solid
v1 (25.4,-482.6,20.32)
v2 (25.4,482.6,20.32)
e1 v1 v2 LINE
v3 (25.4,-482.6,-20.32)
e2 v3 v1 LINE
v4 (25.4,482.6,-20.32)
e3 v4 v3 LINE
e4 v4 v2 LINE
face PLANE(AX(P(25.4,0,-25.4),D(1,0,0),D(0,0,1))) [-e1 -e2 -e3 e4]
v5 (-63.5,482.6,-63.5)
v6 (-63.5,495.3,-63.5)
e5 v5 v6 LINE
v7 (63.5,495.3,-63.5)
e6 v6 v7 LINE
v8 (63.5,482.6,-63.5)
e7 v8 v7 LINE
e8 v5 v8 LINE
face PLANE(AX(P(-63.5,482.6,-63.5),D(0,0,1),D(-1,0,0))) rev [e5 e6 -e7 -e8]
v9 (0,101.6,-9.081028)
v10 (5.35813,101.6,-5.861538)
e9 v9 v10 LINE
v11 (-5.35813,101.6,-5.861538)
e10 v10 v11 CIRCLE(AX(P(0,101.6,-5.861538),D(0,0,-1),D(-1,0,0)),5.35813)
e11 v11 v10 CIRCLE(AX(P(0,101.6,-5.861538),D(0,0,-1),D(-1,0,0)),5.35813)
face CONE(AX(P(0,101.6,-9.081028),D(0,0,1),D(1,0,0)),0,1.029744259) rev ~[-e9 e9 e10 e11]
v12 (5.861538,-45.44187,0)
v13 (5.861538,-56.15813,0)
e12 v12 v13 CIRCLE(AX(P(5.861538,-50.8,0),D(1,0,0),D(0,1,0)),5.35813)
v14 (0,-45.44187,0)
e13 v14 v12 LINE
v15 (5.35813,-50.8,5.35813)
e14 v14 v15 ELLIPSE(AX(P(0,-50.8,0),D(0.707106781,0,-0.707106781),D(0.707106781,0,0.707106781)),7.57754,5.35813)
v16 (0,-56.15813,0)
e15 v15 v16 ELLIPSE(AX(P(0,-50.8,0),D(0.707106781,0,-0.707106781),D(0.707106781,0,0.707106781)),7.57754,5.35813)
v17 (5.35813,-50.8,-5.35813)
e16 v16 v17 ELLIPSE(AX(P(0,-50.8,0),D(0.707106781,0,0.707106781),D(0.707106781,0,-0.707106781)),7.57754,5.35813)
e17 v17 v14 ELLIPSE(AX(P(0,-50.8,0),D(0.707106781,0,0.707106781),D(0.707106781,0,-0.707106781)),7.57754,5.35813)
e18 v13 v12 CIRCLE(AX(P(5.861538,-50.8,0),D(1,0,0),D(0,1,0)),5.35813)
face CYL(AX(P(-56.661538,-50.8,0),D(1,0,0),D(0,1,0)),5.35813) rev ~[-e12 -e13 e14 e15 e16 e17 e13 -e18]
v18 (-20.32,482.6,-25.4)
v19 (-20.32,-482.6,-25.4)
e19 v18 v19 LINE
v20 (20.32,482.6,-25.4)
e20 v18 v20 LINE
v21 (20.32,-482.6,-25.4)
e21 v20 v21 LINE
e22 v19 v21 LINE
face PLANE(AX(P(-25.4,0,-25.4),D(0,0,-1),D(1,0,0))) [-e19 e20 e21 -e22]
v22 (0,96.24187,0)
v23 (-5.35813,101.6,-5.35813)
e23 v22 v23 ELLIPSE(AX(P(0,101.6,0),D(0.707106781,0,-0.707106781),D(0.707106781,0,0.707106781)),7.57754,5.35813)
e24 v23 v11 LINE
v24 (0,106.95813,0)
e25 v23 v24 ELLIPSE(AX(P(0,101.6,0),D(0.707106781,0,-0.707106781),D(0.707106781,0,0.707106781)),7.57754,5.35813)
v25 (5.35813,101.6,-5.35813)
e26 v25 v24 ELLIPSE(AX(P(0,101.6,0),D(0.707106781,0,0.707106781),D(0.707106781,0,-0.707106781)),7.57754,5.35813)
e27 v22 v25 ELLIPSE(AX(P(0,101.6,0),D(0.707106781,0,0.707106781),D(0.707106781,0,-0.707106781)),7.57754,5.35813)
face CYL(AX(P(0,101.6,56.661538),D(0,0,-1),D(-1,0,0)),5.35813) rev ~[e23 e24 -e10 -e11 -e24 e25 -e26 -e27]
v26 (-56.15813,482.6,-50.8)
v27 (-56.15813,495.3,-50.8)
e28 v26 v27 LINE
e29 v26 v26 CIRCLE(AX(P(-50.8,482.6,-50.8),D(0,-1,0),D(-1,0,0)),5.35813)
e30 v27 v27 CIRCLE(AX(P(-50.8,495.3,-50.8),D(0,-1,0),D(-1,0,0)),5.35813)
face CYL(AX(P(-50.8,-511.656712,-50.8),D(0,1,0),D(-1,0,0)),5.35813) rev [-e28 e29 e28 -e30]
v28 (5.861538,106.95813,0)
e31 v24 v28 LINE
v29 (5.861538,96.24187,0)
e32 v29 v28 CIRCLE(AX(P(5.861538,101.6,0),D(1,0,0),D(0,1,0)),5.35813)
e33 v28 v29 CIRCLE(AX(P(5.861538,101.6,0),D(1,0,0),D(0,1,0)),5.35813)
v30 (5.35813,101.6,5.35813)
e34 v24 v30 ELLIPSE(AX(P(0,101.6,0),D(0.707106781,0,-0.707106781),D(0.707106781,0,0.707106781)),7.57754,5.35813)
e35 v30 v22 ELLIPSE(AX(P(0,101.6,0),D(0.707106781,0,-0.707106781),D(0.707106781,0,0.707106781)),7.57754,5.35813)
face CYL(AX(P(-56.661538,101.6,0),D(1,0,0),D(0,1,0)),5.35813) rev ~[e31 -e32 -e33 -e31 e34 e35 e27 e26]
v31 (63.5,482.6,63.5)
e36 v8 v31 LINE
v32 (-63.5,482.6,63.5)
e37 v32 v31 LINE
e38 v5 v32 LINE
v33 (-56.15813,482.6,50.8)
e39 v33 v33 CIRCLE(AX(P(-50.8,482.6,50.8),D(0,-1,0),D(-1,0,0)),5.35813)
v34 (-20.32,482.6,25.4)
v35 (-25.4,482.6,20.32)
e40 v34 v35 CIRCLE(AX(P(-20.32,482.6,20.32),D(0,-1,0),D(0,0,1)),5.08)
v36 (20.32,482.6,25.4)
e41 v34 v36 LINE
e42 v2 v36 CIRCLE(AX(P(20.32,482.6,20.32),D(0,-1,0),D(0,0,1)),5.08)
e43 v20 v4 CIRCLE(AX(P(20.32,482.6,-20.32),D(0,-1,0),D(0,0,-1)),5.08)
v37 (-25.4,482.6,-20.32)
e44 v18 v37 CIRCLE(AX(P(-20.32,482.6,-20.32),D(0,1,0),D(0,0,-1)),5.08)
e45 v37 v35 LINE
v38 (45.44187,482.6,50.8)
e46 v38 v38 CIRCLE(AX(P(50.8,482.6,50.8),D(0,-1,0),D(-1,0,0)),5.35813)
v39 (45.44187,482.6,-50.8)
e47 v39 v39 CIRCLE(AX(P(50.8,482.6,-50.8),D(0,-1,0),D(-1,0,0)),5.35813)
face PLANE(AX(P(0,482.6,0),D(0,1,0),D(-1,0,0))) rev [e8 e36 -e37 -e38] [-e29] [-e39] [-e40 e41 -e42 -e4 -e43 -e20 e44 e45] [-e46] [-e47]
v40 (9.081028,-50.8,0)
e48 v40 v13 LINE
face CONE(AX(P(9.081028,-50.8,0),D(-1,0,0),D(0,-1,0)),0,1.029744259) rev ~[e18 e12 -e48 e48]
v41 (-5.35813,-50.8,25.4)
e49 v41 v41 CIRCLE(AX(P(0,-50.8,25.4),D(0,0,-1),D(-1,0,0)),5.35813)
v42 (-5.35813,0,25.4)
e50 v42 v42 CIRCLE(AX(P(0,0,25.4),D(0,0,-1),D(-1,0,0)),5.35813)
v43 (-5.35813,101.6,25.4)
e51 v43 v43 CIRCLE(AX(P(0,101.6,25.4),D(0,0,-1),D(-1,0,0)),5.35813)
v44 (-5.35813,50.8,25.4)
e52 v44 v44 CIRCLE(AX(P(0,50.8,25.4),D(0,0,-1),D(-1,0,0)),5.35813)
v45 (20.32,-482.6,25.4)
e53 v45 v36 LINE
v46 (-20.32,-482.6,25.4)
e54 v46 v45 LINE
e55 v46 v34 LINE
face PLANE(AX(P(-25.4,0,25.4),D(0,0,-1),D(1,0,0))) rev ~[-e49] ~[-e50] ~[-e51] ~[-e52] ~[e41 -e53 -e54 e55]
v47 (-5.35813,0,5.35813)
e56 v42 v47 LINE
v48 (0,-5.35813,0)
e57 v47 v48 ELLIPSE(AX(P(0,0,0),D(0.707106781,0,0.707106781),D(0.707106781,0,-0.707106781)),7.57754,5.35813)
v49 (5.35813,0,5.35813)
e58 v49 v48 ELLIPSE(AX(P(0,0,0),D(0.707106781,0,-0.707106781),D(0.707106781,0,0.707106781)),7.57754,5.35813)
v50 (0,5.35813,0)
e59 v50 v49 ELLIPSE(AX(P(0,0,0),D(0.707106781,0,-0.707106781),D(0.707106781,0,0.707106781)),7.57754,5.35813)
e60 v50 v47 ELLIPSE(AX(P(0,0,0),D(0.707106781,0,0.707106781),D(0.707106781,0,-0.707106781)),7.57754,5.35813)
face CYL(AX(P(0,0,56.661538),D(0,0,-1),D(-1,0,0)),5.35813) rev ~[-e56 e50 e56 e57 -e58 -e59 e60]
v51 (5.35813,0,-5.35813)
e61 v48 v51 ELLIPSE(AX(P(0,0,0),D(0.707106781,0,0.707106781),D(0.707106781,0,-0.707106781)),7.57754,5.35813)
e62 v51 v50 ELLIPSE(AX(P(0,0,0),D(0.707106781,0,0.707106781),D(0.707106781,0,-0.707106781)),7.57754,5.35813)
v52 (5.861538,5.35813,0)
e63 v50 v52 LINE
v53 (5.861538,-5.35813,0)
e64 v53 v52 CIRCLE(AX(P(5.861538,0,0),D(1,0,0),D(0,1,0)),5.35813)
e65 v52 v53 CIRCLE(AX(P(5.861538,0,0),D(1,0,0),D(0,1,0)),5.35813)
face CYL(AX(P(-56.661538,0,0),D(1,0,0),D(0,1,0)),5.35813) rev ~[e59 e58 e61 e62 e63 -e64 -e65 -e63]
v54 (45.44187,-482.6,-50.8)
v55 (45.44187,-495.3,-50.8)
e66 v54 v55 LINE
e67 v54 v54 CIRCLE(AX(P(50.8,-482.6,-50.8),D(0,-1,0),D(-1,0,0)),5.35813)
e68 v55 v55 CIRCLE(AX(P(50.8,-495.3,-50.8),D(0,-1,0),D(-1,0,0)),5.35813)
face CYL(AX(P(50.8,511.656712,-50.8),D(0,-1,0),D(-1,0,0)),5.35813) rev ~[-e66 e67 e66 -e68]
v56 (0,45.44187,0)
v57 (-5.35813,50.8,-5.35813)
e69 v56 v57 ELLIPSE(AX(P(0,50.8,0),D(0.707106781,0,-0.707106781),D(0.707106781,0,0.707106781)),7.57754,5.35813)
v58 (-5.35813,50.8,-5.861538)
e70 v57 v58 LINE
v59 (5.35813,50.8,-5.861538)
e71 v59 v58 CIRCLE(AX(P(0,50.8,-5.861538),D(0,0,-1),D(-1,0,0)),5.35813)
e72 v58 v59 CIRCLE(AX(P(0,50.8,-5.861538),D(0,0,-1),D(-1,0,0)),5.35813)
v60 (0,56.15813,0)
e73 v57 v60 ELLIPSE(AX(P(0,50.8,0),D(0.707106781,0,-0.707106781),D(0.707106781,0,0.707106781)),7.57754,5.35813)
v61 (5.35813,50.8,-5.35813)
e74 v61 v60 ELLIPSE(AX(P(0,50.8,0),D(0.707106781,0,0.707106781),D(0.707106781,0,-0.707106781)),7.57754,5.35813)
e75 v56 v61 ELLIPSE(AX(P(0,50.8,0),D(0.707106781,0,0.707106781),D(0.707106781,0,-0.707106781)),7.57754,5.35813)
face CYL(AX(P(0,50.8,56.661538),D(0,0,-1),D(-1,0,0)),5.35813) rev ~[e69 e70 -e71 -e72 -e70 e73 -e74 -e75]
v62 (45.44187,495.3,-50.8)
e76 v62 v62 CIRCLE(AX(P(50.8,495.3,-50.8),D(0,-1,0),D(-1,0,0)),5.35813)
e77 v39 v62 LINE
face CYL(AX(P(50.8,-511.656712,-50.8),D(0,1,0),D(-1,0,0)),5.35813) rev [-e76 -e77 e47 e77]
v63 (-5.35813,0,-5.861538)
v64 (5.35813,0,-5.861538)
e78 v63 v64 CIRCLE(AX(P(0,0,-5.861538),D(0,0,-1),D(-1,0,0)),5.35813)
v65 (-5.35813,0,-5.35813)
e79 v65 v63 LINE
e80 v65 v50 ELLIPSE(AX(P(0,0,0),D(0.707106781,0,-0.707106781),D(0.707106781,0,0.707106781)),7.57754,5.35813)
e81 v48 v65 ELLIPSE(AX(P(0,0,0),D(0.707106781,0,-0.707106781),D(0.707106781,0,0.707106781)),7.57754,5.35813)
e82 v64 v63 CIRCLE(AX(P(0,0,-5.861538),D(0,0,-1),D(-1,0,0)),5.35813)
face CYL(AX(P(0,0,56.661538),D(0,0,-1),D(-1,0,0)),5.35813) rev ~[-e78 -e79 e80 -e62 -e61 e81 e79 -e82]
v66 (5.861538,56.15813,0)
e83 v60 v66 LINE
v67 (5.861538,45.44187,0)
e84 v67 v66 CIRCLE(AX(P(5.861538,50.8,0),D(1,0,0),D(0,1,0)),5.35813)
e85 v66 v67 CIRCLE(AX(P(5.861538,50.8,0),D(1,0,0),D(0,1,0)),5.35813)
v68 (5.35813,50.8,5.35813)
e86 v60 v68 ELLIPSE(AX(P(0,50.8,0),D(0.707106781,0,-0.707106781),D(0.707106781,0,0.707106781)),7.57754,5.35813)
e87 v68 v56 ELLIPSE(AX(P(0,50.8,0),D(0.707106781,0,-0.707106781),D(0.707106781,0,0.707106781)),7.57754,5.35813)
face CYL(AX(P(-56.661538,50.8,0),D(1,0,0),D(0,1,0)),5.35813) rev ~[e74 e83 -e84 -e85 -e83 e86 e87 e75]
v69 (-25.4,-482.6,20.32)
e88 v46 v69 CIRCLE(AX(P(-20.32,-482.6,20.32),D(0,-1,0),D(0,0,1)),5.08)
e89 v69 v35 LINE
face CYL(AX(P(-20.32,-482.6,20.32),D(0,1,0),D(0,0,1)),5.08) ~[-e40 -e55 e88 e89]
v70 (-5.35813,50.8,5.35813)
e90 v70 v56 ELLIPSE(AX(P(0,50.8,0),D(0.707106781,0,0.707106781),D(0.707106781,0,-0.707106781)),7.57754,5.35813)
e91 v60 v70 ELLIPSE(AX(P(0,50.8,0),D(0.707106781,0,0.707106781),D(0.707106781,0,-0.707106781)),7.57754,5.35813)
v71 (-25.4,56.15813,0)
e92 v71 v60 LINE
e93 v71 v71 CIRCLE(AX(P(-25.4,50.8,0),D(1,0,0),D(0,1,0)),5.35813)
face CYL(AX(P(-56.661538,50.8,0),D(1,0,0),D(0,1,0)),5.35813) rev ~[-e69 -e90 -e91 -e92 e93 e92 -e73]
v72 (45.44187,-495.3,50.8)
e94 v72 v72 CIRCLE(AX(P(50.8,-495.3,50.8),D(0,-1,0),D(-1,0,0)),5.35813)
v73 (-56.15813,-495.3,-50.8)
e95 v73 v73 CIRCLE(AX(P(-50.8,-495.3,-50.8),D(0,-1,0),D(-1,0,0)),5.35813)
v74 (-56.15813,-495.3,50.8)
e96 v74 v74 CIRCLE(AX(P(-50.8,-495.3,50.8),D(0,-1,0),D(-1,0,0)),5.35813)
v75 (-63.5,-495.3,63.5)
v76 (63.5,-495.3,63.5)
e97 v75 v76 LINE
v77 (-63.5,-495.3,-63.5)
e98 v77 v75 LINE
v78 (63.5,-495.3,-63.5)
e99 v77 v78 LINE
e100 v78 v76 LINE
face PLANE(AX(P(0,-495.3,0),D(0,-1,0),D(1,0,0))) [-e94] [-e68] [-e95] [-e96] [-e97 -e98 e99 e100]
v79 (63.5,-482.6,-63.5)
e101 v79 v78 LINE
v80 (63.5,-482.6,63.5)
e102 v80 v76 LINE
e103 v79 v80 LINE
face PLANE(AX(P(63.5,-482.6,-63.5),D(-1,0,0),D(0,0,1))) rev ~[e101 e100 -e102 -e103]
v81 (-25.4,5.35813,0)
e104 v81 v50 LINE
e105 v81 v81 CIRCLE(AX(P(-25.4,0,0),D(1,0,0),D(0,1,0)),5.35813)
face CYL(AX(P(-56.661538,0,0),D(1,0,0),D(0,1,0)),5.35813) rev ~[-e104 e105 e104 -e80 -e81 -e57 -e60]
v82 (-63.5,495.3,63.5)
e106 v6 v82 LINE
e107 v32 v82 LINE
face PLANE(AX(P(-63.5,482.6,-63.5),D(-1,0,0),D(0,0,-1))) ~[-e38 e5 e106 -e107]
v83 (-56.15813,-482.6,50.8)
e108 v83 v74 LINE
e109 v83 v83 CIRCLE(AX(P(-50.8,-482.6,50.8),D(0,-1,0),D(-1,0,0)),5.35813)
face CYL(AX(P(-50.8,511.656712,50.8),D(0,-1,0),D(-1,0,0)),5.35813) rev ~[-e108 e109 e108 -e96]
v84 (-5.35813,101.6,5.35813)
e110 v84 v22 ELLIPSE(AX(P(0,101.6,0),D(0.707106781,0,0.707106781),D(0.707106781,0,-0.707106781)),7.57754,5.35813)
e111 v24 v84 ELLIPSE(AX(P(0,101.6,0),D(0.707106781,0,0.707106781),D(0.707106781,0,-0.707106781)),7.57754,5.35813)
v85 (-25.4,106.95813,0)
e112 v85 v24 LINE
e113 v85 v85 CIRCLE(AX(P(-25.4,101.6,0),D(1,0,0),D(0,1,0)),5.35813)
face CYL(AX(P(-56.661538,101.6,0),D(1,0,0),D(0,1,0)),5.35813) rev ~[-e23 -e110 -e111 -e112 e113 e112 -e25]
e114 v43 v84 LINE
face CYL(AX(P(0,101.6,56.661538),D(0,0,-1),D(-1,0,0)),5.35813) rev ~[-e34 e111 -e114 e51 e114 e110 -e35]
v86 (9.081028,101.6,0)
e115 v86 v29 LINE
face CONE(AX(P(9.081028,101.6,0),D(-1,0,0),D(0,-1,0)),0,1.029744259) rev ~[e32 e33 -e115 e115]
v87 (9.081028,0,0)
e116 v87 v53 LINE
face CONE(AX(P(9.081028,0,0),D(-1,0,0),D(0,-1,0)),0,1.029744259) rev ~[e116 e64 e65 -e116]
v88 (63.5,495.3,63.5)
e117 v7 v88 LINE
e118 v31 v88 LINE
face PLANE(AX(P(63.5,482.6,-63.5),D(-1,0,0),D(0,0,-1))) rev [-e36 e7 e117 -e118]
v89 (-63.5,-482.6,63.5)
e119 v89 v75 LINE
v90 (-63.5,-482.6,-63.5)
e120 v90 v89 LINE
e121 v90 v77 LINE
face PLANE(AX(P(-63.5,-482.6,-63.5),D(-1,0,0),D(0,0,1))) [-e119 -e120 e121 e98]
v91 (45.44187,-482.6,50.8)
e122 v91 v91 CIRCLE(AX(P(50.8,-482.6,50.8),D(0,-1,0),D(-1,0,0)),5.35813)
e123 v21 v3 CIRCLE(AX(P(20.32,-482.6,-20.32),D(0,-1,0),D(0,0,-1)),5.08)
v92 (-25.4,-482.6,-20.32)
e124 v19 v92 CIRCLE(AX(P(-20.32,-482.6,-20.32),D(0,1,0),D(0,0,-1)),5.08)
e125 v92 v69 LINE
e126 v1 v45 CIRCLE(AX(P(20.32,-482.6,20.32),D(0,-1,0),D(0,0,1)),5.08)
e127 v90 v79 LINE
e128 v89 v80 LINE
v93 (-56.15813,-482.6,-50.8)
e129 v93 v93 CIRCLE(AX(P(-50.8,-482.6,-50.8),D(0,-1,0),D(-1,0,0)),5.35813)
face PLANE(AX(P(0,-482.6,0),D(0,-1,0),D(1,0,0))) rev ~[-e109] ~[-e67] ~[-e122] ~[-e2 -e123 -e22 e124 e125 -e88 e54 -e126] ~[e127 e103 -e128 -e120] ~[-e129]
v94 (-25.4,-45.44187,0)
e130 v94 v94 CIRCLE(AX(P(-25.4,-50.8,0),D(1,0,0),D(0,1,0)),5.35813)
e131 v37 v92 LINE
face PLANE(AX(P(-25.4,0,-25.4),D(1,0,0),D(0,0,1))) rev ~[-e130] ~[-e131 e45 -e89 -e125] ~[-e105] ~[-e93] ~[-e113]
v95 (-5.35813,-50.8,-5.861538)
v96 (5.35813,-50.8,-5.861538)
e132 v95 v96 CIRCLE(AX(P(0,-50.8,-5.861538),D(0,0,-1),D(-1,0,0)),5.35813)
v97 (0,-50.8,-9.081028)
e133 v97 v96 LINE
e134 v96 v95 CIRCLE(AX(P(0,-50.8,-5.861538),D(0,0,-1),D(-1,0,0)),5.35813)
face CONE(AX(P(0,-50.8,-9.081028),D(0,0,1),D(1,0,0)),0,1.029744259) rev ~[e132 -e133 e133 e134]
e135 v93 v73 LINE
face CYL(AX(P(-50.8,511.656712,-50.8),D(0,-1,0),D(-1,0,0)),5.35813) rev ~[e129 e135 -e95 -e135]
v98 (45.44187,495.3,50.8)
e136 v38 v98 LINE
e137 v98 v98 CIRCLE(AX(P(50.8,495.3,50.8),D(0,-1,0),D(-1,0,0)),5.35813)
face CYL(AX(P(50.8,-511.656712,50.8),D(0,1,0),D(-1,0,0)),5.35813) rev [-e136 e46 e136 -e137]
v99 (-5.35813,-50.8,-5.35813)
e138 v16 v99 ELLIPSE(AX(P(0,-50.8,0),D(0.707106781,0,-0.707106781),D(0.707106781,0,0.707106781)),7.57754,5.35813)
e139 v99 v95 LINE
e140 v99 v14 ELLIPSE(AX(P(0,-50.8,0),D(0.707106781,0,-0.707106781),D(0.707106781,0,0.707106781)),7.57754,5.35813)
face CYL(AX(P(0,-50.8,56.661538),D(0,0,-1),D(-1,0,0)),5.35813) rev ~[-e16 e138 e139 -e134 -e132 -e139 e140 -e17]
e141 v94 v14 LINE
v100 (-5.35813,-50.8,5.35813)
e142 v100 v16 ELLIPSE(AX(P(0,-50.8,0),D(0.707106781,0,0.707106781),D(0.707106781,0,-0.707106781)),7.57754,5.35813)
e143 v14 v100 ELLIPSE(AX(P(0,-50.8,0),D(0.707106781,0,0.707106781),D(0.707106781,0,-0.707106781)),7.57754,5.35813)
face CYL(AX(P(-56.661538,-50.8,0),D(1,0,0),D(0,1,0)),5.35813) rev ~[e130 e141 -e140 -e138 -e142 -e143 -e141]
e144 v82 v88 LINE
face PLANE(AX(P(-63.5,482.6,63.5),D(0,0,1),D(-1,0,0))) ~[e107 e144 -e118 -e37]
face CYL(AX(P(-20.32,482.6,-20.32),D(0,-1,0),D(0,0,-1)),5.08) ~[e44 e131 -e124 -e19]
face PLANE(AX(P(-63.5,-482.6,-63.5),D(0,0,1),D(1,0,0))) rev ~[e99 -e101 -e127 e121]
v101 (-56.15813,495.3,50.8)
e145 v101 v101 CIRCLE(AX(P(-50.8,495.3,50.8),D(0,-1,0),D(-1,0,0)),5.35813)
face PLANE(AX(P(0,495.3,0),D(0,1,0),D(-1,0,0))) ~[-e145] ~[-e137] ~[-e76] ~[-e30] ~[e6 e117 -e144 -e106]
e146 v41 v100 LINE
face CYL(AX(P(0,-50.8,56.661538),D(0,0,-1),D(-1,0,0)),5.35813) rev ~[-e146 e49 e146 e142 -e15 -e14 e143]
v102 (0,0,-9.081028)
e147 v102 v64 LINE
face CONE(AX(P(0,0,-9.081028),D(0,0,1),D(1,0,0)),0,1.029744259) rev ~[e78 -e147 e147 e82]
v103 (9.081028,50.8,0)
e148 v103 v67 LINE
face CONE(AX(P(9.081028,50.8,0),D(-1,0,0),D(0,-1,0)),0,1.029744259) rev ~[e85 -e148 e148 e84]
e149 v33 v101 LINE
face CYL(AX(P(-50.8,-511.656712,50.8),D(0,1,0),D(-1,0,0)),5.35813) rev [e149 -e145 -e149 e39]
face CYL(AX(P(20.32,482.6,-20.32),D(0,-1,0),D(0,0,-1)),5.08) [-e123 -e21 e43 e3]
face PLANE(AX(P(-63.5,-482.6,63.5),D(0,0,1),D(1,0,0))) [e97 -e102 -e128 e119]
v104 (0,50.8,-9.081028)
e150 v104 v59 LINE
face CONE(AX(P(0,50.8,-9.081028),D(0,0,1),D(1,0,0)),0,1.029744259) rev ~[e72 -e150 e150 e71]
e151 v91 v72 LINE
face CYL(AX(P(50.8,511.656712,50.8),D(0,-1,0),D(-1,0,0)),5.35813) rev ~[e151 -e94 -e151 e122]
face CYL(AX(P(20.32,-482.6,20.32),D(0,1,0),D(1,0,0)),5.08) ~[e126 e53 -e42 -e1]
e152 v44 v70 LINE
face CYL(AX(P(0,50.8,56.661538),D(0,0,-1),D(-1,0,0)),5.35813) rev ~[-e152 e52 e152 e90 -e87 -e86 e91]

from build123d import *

# Parameters (mm, degrees)
F0_W           = 50.8
F0_H           = 50.8
F1_DEPTH       = 482.6
F2_W           = 127
F2_H           = 127
F2_W_2         = 50.8
F2_H_2         = 50.8
F3_DEPTH       = 12.7
F4_R           = 5.08
F5_D           = 10.71626
F9_D           = 10.71626
F9_DEPTH       = 31.2615384615
F9_TIP         = 3.2194893086
F9_ON_F8_D     = 10.71626
F9_ON_F8_DEPTH = 31.2615384615
F9_ON_F8_TIP   = 3.2194893086


# Not quite as in the source:
# - a feature names something its author has since deleted; it is built from what else it names


with BuildPart() as f1:
    # F0 (on Front) → F1 (new body, symmetric)
    with BuildSketch(Plane.XZ):
        Rectangle(F0_W, F0_H)
    extrude(amount=F1_DEPTH, both=True)

    # F2 (on face) → F3 (join)
    with BuildSketch(Plane.XZ.offset(482.6)):
        Rectangle(F2_W, F2_H)
        Rectangle(F2_W_2, F2_H_2, mode=Mode.SUBTRACT)
        Rectangle(F2_W_2, F2_H_2)
    extrude(amount=F3_DEPTH)

    # F4
    f4_edges = [f1.edges().sort_by_distance(p)[0] for p in [
        (25.4, 0, 25.4),
        (-25.4, 0, 25.4),
        (-25.4, 0, -25.4),
        (25.4, 0, -25.4),
    ]]
    fillet(f4_edges, radius=F4_R)

    # F5 (through all)
    with Locations(Plane(origin=(0, -482.6, 0), x_dir=(1, 0, 0), z_dir=(0, 1, 0))):
        with Locations((-50.8, -50.8), (50.8, -50.8), (50.8, 50.8), (-50.8, 50.8)):
            Hole(F5_D / 2)

    # F6: F1 across plane


with BuildPart() as f1_1:
    add(f1.part)
    add(f1.part.mirror(Plane.XZ))

    # F9
    with Locations(Plane(origin=(-25.4, 0, 0), x_dir=(0, -1, 0), z_dir=(-1, 0, 0))):
        with Locations((-50.8, 0), (50.8, 0), (-101.6, 0), (0, 0)):
            Hole(F9_D / 2, depth=F9_DEPTH)
            with Locations((0, 0, -(F9_DEPTH + F9_TIP / 2))):  # 118° drill point
                Cone(0, F9_D / 2, F9_TIP, mode=Mode.SUBTRACT)

    # F9 on F8
    with Locations(Plane.XY.offset(25.4)):
        with Locations((0, 0), (0, 101.6), (0, 50.8), (0, -50.8)):
            Hole(F9_ON_F8_D / 2, depth=F9_ON_F8_DEPTH)
            with Locations((0, 0, -(F9_ON_F8_DEPTH + F9_ON_F8_TIP / 2))):  # 118° drill point
                Cone(0, F9_ON_F8_D / 2, F9_ON_F8_TIP, mode=Mode.SUBTRACT)


solid = f1_1.part
